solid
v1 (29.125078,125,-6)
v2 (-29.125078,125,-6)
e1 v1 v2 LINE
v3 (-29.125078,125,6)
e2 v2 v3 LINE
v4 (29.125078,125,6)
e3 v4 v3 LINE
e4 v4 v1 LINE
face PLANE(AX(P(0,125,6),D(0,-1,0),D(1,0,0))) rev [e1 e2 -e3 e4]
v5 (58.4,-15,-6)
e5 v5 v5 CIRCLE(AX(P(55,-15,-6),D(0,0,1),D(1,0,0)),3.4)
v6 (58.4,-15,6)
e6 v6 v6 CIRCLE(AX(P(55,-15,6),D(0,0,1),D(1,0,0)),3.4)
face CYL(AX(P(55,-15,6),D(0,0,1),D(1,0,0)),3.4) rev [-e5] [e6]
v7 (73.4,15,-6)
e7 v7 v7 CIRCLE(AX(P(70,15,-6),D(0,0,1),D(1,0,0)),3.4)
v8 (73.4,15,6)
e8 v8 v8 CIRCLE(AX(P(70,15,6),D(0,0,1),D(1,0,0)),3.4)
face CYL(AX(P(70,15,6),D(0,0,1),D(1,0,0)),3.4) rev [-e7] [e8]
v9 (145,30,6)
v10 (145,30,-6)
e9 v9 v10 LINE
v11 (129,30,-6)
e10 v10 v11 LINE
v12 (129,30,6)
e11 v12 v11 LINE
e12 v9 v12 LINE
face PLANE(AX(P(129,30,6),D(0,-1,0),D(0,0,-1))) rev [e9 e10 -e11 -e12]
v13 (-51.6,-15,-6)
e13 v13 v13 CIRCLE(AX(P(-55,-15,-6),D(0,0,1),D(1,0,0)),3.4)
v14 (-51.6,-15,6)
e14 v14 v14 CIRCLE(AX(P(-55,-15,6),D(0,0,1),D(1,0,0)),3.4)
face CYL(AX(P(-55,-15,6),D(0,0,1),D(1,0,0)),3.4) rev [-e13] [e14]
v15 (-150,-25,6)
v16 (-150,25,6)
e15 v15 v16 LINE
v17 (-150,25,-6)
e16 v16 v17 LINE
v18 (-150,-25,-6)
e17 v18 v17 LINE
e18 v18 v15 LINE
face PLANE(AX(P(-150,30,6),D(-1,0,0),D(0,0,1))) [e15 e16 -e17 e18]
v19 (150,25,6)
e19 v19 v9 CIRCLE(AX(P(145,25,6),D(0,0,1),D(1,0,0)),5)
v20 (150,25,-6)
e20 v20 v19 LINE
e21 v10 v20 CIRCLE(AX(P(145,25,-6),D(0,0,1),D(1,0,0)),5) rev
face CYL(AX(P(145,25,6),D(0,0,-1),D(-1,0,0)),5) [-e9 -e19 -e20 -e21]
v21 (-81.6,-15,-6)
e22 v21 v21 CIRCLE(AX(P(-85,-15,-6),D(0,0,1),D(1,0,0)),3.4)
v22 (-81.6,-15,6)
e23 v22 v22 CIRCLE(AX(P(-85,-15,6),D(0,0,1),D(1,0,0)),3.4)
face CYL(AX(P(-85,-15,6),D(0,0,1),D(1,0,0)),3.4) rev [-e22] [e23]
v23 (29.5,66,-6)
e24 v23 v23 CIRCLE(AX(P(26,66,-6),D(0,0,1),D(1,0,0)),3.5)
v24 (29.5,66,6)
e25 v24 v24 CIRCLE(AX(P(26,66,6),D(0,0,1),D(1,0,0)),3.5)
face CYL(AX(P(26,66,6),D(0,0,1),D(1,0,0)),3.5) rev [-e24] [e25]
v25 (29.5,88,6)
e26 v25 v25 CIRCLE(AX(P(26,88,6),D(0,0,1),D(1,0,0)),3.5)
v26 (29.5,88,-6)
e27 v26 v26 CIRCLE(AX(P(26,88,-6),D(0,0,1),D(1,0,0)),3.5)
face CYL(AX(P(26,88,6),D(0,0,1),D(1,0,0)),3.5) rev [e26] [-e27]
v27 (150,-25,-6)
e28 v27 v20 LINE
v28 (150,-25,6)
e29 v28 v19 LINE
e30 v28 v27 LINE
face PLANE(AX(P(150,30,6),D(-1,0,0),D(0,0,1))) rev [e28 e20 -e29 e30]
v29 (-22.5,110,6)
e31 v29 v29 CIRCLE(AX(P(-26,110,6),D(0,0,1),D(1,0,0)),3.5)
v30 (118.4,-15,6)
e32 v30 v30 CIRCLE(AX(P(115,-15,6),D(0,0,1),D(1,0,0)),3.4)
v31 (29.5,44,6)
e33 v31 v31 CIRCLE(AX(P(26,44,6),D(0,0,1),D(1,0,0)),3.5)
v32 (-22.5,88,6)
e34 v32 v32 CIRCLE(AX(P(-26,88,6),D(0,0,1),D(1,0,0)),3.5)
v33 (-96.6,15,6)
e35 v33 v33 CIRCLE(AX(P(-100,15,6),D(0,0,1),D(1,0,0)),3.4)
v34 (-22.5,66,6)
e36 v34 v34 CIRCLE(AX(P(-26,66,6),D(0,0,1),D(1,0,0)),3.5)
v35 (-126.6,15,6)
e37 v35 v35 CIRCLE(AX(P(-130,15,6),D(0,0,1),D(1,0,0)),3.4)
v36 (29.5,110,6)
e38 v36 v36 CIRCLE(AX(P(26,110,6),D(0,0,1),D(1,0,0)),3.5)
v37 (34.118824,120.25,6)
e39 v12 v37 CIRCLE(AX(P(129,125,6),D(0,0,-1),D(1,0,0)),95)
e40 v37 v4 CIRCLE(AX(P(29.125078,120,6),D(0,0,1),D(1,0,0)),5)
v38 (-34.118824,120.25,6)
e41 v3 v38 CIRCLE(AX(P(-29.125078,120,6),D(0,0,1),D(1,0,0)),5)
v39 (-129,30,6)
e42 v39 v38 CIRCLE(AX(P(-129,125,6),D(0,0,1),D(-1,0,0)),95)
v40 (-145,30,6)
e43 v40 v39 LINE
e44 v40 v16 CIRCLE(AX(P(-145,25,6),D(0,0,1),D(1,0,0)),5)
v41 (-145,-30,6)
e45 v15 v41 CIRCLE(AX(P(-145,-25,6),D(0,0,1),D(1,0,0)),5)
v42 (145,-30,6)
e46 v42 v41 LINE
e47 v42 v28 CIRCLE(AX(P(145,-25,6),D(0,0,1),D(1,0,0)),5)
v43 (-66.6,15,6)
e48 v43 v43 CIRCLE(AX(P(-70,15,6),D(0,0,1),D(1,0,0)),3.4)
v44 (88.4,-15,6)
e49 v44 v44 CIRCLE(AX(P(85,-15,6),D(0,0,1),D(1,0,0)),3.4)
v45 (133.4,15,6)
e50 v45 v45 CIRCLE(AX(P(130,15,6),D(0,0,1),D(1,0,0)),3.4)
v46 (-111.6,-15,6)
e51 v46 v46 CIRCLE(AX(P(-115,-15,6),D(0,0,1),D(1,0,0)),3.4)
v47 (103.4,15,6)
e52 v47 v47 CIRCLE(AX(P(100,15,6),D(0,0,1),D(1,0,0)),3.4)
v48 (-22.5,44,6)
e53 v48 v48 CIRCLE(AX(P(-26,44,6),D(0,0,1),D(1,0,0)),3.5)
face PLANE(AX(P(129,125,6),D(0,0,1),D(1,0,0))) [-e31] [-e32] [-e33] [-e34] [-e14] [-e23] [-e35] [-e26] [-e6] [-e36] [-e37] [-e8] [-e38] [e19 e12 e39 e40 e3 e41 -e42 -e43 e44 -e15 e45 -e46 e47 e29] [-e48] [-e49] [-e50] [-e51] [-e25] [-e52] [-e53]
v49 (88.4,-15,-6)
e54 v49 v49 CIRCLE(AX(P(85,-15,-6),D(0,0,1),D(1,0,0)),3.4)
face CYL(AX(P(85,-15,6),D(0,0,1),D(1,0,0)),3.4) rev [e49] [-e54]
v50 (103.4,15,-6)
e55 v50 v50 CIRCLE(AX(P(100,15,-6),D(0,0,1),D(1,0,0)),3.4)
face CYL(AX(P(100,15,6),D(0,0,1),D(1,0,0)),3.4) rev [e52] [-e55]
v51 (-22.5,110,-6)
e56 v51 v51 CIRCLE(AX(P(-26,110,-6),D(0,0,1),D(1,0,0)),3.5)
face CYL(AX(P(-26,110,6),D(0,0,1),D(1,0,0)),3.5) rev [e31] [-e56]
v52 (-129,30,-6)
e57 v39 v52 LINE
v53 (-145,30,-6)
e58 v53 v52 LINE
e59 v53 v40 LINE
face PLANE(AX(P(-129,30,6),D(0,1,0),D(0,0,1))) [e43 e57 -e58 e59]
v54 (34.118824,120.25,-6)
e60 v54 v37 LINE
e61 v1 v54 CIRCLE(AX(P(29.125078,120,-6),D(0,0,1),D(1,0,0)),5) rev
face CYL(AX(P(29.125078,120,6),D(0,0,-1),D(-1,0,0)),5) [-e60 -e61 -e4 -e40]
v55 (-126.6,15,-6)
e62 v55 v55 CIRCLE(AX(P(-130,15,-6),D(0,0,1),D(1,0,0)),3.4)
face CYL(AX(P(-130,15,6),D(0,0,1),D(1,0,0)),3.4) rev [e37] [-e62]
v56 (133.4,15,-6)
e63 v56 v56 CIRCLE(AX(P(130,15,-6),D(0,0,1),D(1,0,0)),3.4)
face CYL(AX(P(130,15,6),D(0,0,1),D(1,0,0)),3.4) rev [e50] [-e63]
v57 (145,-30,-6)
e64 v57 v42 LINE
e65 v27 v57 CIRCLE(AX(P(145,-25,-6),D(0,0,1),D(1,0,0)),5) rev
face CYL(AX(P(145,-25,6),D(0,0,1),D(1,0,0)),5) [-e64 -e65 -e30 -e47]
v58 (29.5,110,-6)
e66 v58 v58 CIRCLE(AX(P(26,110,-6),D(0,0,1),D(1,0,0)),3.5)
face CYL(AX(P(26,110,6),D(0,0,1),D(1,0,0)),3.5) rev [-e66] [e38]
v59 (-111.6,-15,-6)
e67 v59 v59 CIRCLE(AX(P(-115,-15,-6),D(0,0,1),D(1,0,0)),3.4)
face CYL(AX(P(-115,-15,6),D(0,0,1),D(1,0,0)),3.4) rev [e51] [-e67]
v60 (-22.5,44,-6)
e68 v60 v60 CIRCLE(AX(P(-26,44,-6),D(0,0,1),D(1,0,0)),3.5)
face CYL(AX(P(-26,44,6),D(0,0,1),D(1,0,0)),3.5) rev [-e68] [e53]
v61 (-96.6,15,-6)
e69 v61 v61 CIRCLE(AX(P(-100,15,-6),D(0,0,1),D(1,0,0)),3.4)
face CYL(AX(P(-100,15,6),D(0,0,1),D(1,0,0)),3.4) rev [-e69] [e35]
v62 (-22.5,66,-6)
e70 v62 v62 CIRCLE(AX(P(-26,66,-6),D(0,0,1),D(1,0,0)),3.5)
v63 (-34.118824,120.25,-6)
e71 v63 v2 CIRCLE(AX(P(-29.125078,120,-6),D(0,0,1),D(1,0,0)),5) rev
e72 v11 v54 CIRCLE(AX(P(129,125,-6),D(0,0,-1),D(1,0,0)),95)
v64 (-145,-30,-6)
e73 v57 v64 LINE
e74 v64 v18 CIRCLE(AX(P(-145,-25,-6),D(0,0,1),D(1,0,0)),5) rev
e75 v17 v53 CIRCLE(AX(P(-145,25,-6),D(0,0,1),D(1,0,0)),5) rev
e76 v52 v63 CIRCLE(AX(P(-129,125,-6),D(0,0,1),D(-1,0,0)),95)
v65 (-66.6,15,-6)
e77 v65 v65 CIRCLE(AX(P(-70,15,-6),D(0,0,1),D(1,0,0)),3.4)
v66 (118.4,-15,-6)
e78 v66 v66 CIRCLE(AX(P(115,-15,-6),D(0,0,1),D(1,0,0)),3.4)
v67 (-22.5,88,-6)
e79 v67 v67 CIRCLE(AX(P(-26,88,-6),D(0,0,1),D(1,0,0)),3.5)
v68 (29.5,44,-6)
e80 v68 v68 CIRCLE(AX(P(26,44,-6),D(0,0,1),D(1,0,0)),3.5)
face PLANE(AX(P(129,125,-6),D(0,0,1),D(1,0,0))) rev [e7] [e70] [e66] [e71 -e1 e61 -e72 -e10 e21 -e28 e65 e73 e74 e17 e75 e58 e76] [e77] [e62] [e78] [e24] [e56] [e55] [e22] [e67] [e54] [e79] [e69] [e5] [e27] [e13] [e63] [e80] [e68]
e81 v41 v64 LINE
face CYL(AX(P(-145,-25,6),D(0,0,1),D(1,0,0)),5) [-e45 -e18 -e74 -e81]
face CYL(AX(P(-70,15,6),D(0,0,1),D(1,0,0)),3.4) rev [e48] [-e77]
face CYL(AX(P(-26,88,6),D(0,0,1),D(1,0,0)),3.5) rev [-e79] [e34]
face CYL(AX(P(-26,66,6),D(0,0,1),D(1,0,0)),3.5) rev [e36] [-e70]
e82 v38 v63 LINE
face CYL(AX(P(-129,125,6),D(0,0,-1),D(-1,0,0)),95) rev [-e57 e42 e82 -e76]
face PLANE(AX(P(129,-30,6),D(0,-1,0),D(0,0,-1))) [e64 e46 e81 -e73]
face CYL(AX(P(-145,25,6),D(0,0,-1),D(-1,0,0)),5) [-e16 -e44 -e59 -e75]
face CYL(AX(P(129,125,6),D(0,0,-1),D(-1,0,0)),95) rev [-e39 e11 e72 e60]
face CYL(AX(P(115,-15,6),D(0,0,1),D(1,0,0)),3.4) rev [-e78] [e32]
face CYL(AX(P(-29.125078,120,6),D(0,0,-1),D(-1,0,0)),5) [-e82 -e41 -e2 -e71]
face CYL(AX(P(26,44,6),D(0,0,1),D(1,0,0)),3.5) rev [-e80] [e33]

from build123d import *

# Parameters (mm, degrees)
BOSS_EXTRUDE1_DEPTH        = 6
F_7_0_7_DIAMETER_HOLE1_D   = 7
LPATTERN1_COUNT            = 4
LPATTERN1_PITCH            = 22
FILLET1_R                  = 5
MIRROR1_COPY_1_D           = 7
MIRROR1_COPY_2_D           = 7
MIRROR1_COPY_3_D           = 7
FILLET1_OF_MIRROR1_R       = 5
MIRROR5_COPY_1_D           = 7
MIRROR5_COPY_2_D           = 7
MIRROR5_COPY_3_D           = 7
FILLET1_OF_MIRROR5_R       = 5
MIRROR6_START              = -6
MIRROR6_OUTLINE_R          = 3.5
MIRROR6_DEPTH              = 12
F_6_8_6_8_DIAMETER_HOLE1_D = 6.8
SKETCH9_W                  = 314.382892994
SKETCH9_H                  = 141.517755545
CUT_EXTRUDE1_DEPTH         = 196.624640575


# Read off the part's stored shape, not the designer's step: Mirror6
with BuildPart() as part:
    # Sketch1 → Boss-Extrude1 (new, symmetric)
    with BuildSketch(Plane.XY):
        with BuildLine():
            Line((0, 0), (0, 125))
            Line((0, 125), (34, 125))
            ThreePointArc((34, 125), (61.824855787, 57.824855787), (129, 30))
            Line((129, 30), (150, 30))
            Line((150, 30), (150, 0))
            Line((150, 0), (114.303256495, 0))
            Line((114.303256495, 0), (0, 0))
        make_face()
    boss_extrude1 = extrude(amount=BOSS_EXTRUDE1_DEPTH, both=True)

    # Ø7.0 (7) Diameter Hole1 (through all)
    with Locations(Plane.XY.offset(6)):
        with Locations((26, 110)):
            f_7_0_7_diameter_hole1 = Hole(F_7_0_7_DIAMETER_HOLE1_D / 2)

    # LPattern1: Ø7.0 (7) Diameter Hole1 ×4
    with Locations(*[(0, -i * LPATTERN1_PITCH, 0) for i in range(1, LPATTERN1_COUNT)]):
        add(f_7_0_7_diameter_hole1, mode=Mode.SUBTRACT)

    # Fillet1
    fillet1_edges = [part.edges().sort_by_distance(p)[0] for p in [
        (34, 125, 0),
        (150, 30, 0),
    ]]
    fillet(fillet1_edges, radius=FILLET1_R)

    # Mirror1: Boss-Extrude1, Ø7.0 (7) Diameter Hole1 across plane
    add(boss_extrude1.mirror(Plane(origin=(0, 0, 6), x_dir=(0, 0, 1), z_dir=(1, 0, 0))))
    add(f_7_0_7_diameter_hole1.mirror(Plane(origin=(0, 0, 6), x_dir=(0, 0, 1), z_dir=(1, 0, 0))), mode=Mode.SUBTRACT)

    # Mirror1 copy 1 (through all)
    with Locations(Plane(origin=(0, -22, 6), x_dir=(-1, 0, 0), z_dir=(0, 0, 1))):
        with Locations((26, -110)):
            Hole(MIRROR1_COPY_1_D / 2)

    # Mirror1 copy 2 (through all)
    with Locations(Plane(origin=(0, -44, 6), x_dir=(-1, 0, 0), z_dir=(0, 0, 1))):
        with Locations((26, -110)):
            Hole(MIRROR1_COPY_2_D / 2)

    # Mirror1 copy 3 (through all)
    with Locations(Plane(origin=(0, -66, 6), x_dir=(-1, 0, 0), z_dir=(0, 0, 1))):
        with Locations((26, -110)):
            Hole(MIRROR1_COPY_3_D / 2)

    # Fillet1 of Mirror1
    fillet1_of_mirror1_edges = [part.edges().sort_by_distance(p)[0] for p in [
        (-34, 125, 0),
        (-150, 30, 0),
    ]]
    fillet(fillet1_of_mirror1_edges, radius=FILLET1_OF_MIRROR1_R)

    # Mirror5: Boss-Extrude1, Ø7.0 (7) Diameter Hole1 across plane
    add(boss_extrude1.mirror(Plane.ZX))
    add(f_7_0_7_diameter_hole1.mirror(Plane.ZX), mode=Mode.SUBTRACT)

    # Mirror5 copy 1 (through all)
    with Locations(Plane(origin=(0, 22, 6), x_dir=(1, 0, 0), z_dir=(0, 0, 1))):
        with Locations((26, -110)):
            Hole(MIRROR5_COPY_1_D / 2)

    # Mirror5 copy 2 (through all)
    with Locations(Plane(origin=(0, 44, 6), x_dir=(1, 0, 0), z_dir=(0, 0, 1))):
        with Locations((26, -110)):
            Hole(MIRROR5_COPY_2_D / 2)

    # Mirror5 copy 3 (through all)
    with Locations(Plane(origin=(0, 66, 6), x_dir=(1, 0, 0), z_dir=(0, 0, 1))):
        with Locations((26, -110)):
            Hole(MIRROR5_COPY_3_D / 2)

    # Fillet1 of Mirror5
    fillet1_of_mirror5_edges = [part.edges().sort_by_distance(p)[0] for p in [
        (34, -125, 0),
        (150, -30, 0),
    ]]
    fillet(fillet1_of_mirror5_edges, radius=FILLET1_OF_MIRROR5_R)

    # Mirror6 outline → Mirror6 (add)
    with BuildSketch(Plane.XY.offset(MIRROR6_START)):
        with BuildLine():
            Line((0, 0), (-150, 0))
            Line((-150, 0), (-150, -25))
            ThreePointArc((-150, -25), (-148.535533906, -28.535533906), (-145, -30))
            Line((-145, -30), (-129, -30))
            ThreePointArc((-129, -30), (-63.525768428, -56.165960456), (-34.118824312, -120.25))
            ThreePointArc((-34.118824312, -120.25), (-32.571090411, -123.622844187), (-29.125078223, -125))
            Line((-29.125078223, -125), (0, -125))
            Line((0, -125), (0, 0))
        make_face()
        with Locations((-26, -110)):
            Circle(MIRROR6_OUTLINE_R, mode=Mode.SUBTRACT)
        with Locations((-26, -88)):
            Circle(MIRROR6_OUTLINE_R, mode=Mode.SUBTRACT)
        with Locations((-26, -66)):
            Circle(MIRROR6_OUTLINE_R, mode=Mode.SUBTRACT)
        with Locations((-26, -44)):
            Circle(MIRROR6_OUTLINE_R, mode=Mode.SUBTRACT)
    extrude(amount=MIRROR6_DEPTH)

    # Ø6.8 (6.8) Diameter Hole1 (through all)
    with Locations(Plane.XY.offset(6)):
        with Locations((130, 15), (100, 15), (70, 15), (115, -15), (85, -15), (55, -15)):
            f_6_8_6_8_diameter_hole1 = Hole(F_6_8_6_8_DIAMETER_HOLE1_D / 2)

    # Mirror7: Ø6.8 (6.8) Diameter Hole1 across plane
    add(f_6_8_6_8_diameter_hole1.mirror(Plane(origin=(0, 0, 0), x_dir=(0, 0, 1), z_dir=(1, 0, 0))), mode=Mode.SUBTRACT)

    # Sketch9 → Cut-Extrude1 (cut, through all)
    with BuildSketch(Plane.XY.offset(6)):
        with Locations((3.183624233, -100.758877772)):
            Rectangle(SKETCH9_W, SKETCH9_H)
    extrude(amount=-CUT_EXTRUDE1_DEPTH, mode=Mode.SUBTRACT)


solid = part.part
